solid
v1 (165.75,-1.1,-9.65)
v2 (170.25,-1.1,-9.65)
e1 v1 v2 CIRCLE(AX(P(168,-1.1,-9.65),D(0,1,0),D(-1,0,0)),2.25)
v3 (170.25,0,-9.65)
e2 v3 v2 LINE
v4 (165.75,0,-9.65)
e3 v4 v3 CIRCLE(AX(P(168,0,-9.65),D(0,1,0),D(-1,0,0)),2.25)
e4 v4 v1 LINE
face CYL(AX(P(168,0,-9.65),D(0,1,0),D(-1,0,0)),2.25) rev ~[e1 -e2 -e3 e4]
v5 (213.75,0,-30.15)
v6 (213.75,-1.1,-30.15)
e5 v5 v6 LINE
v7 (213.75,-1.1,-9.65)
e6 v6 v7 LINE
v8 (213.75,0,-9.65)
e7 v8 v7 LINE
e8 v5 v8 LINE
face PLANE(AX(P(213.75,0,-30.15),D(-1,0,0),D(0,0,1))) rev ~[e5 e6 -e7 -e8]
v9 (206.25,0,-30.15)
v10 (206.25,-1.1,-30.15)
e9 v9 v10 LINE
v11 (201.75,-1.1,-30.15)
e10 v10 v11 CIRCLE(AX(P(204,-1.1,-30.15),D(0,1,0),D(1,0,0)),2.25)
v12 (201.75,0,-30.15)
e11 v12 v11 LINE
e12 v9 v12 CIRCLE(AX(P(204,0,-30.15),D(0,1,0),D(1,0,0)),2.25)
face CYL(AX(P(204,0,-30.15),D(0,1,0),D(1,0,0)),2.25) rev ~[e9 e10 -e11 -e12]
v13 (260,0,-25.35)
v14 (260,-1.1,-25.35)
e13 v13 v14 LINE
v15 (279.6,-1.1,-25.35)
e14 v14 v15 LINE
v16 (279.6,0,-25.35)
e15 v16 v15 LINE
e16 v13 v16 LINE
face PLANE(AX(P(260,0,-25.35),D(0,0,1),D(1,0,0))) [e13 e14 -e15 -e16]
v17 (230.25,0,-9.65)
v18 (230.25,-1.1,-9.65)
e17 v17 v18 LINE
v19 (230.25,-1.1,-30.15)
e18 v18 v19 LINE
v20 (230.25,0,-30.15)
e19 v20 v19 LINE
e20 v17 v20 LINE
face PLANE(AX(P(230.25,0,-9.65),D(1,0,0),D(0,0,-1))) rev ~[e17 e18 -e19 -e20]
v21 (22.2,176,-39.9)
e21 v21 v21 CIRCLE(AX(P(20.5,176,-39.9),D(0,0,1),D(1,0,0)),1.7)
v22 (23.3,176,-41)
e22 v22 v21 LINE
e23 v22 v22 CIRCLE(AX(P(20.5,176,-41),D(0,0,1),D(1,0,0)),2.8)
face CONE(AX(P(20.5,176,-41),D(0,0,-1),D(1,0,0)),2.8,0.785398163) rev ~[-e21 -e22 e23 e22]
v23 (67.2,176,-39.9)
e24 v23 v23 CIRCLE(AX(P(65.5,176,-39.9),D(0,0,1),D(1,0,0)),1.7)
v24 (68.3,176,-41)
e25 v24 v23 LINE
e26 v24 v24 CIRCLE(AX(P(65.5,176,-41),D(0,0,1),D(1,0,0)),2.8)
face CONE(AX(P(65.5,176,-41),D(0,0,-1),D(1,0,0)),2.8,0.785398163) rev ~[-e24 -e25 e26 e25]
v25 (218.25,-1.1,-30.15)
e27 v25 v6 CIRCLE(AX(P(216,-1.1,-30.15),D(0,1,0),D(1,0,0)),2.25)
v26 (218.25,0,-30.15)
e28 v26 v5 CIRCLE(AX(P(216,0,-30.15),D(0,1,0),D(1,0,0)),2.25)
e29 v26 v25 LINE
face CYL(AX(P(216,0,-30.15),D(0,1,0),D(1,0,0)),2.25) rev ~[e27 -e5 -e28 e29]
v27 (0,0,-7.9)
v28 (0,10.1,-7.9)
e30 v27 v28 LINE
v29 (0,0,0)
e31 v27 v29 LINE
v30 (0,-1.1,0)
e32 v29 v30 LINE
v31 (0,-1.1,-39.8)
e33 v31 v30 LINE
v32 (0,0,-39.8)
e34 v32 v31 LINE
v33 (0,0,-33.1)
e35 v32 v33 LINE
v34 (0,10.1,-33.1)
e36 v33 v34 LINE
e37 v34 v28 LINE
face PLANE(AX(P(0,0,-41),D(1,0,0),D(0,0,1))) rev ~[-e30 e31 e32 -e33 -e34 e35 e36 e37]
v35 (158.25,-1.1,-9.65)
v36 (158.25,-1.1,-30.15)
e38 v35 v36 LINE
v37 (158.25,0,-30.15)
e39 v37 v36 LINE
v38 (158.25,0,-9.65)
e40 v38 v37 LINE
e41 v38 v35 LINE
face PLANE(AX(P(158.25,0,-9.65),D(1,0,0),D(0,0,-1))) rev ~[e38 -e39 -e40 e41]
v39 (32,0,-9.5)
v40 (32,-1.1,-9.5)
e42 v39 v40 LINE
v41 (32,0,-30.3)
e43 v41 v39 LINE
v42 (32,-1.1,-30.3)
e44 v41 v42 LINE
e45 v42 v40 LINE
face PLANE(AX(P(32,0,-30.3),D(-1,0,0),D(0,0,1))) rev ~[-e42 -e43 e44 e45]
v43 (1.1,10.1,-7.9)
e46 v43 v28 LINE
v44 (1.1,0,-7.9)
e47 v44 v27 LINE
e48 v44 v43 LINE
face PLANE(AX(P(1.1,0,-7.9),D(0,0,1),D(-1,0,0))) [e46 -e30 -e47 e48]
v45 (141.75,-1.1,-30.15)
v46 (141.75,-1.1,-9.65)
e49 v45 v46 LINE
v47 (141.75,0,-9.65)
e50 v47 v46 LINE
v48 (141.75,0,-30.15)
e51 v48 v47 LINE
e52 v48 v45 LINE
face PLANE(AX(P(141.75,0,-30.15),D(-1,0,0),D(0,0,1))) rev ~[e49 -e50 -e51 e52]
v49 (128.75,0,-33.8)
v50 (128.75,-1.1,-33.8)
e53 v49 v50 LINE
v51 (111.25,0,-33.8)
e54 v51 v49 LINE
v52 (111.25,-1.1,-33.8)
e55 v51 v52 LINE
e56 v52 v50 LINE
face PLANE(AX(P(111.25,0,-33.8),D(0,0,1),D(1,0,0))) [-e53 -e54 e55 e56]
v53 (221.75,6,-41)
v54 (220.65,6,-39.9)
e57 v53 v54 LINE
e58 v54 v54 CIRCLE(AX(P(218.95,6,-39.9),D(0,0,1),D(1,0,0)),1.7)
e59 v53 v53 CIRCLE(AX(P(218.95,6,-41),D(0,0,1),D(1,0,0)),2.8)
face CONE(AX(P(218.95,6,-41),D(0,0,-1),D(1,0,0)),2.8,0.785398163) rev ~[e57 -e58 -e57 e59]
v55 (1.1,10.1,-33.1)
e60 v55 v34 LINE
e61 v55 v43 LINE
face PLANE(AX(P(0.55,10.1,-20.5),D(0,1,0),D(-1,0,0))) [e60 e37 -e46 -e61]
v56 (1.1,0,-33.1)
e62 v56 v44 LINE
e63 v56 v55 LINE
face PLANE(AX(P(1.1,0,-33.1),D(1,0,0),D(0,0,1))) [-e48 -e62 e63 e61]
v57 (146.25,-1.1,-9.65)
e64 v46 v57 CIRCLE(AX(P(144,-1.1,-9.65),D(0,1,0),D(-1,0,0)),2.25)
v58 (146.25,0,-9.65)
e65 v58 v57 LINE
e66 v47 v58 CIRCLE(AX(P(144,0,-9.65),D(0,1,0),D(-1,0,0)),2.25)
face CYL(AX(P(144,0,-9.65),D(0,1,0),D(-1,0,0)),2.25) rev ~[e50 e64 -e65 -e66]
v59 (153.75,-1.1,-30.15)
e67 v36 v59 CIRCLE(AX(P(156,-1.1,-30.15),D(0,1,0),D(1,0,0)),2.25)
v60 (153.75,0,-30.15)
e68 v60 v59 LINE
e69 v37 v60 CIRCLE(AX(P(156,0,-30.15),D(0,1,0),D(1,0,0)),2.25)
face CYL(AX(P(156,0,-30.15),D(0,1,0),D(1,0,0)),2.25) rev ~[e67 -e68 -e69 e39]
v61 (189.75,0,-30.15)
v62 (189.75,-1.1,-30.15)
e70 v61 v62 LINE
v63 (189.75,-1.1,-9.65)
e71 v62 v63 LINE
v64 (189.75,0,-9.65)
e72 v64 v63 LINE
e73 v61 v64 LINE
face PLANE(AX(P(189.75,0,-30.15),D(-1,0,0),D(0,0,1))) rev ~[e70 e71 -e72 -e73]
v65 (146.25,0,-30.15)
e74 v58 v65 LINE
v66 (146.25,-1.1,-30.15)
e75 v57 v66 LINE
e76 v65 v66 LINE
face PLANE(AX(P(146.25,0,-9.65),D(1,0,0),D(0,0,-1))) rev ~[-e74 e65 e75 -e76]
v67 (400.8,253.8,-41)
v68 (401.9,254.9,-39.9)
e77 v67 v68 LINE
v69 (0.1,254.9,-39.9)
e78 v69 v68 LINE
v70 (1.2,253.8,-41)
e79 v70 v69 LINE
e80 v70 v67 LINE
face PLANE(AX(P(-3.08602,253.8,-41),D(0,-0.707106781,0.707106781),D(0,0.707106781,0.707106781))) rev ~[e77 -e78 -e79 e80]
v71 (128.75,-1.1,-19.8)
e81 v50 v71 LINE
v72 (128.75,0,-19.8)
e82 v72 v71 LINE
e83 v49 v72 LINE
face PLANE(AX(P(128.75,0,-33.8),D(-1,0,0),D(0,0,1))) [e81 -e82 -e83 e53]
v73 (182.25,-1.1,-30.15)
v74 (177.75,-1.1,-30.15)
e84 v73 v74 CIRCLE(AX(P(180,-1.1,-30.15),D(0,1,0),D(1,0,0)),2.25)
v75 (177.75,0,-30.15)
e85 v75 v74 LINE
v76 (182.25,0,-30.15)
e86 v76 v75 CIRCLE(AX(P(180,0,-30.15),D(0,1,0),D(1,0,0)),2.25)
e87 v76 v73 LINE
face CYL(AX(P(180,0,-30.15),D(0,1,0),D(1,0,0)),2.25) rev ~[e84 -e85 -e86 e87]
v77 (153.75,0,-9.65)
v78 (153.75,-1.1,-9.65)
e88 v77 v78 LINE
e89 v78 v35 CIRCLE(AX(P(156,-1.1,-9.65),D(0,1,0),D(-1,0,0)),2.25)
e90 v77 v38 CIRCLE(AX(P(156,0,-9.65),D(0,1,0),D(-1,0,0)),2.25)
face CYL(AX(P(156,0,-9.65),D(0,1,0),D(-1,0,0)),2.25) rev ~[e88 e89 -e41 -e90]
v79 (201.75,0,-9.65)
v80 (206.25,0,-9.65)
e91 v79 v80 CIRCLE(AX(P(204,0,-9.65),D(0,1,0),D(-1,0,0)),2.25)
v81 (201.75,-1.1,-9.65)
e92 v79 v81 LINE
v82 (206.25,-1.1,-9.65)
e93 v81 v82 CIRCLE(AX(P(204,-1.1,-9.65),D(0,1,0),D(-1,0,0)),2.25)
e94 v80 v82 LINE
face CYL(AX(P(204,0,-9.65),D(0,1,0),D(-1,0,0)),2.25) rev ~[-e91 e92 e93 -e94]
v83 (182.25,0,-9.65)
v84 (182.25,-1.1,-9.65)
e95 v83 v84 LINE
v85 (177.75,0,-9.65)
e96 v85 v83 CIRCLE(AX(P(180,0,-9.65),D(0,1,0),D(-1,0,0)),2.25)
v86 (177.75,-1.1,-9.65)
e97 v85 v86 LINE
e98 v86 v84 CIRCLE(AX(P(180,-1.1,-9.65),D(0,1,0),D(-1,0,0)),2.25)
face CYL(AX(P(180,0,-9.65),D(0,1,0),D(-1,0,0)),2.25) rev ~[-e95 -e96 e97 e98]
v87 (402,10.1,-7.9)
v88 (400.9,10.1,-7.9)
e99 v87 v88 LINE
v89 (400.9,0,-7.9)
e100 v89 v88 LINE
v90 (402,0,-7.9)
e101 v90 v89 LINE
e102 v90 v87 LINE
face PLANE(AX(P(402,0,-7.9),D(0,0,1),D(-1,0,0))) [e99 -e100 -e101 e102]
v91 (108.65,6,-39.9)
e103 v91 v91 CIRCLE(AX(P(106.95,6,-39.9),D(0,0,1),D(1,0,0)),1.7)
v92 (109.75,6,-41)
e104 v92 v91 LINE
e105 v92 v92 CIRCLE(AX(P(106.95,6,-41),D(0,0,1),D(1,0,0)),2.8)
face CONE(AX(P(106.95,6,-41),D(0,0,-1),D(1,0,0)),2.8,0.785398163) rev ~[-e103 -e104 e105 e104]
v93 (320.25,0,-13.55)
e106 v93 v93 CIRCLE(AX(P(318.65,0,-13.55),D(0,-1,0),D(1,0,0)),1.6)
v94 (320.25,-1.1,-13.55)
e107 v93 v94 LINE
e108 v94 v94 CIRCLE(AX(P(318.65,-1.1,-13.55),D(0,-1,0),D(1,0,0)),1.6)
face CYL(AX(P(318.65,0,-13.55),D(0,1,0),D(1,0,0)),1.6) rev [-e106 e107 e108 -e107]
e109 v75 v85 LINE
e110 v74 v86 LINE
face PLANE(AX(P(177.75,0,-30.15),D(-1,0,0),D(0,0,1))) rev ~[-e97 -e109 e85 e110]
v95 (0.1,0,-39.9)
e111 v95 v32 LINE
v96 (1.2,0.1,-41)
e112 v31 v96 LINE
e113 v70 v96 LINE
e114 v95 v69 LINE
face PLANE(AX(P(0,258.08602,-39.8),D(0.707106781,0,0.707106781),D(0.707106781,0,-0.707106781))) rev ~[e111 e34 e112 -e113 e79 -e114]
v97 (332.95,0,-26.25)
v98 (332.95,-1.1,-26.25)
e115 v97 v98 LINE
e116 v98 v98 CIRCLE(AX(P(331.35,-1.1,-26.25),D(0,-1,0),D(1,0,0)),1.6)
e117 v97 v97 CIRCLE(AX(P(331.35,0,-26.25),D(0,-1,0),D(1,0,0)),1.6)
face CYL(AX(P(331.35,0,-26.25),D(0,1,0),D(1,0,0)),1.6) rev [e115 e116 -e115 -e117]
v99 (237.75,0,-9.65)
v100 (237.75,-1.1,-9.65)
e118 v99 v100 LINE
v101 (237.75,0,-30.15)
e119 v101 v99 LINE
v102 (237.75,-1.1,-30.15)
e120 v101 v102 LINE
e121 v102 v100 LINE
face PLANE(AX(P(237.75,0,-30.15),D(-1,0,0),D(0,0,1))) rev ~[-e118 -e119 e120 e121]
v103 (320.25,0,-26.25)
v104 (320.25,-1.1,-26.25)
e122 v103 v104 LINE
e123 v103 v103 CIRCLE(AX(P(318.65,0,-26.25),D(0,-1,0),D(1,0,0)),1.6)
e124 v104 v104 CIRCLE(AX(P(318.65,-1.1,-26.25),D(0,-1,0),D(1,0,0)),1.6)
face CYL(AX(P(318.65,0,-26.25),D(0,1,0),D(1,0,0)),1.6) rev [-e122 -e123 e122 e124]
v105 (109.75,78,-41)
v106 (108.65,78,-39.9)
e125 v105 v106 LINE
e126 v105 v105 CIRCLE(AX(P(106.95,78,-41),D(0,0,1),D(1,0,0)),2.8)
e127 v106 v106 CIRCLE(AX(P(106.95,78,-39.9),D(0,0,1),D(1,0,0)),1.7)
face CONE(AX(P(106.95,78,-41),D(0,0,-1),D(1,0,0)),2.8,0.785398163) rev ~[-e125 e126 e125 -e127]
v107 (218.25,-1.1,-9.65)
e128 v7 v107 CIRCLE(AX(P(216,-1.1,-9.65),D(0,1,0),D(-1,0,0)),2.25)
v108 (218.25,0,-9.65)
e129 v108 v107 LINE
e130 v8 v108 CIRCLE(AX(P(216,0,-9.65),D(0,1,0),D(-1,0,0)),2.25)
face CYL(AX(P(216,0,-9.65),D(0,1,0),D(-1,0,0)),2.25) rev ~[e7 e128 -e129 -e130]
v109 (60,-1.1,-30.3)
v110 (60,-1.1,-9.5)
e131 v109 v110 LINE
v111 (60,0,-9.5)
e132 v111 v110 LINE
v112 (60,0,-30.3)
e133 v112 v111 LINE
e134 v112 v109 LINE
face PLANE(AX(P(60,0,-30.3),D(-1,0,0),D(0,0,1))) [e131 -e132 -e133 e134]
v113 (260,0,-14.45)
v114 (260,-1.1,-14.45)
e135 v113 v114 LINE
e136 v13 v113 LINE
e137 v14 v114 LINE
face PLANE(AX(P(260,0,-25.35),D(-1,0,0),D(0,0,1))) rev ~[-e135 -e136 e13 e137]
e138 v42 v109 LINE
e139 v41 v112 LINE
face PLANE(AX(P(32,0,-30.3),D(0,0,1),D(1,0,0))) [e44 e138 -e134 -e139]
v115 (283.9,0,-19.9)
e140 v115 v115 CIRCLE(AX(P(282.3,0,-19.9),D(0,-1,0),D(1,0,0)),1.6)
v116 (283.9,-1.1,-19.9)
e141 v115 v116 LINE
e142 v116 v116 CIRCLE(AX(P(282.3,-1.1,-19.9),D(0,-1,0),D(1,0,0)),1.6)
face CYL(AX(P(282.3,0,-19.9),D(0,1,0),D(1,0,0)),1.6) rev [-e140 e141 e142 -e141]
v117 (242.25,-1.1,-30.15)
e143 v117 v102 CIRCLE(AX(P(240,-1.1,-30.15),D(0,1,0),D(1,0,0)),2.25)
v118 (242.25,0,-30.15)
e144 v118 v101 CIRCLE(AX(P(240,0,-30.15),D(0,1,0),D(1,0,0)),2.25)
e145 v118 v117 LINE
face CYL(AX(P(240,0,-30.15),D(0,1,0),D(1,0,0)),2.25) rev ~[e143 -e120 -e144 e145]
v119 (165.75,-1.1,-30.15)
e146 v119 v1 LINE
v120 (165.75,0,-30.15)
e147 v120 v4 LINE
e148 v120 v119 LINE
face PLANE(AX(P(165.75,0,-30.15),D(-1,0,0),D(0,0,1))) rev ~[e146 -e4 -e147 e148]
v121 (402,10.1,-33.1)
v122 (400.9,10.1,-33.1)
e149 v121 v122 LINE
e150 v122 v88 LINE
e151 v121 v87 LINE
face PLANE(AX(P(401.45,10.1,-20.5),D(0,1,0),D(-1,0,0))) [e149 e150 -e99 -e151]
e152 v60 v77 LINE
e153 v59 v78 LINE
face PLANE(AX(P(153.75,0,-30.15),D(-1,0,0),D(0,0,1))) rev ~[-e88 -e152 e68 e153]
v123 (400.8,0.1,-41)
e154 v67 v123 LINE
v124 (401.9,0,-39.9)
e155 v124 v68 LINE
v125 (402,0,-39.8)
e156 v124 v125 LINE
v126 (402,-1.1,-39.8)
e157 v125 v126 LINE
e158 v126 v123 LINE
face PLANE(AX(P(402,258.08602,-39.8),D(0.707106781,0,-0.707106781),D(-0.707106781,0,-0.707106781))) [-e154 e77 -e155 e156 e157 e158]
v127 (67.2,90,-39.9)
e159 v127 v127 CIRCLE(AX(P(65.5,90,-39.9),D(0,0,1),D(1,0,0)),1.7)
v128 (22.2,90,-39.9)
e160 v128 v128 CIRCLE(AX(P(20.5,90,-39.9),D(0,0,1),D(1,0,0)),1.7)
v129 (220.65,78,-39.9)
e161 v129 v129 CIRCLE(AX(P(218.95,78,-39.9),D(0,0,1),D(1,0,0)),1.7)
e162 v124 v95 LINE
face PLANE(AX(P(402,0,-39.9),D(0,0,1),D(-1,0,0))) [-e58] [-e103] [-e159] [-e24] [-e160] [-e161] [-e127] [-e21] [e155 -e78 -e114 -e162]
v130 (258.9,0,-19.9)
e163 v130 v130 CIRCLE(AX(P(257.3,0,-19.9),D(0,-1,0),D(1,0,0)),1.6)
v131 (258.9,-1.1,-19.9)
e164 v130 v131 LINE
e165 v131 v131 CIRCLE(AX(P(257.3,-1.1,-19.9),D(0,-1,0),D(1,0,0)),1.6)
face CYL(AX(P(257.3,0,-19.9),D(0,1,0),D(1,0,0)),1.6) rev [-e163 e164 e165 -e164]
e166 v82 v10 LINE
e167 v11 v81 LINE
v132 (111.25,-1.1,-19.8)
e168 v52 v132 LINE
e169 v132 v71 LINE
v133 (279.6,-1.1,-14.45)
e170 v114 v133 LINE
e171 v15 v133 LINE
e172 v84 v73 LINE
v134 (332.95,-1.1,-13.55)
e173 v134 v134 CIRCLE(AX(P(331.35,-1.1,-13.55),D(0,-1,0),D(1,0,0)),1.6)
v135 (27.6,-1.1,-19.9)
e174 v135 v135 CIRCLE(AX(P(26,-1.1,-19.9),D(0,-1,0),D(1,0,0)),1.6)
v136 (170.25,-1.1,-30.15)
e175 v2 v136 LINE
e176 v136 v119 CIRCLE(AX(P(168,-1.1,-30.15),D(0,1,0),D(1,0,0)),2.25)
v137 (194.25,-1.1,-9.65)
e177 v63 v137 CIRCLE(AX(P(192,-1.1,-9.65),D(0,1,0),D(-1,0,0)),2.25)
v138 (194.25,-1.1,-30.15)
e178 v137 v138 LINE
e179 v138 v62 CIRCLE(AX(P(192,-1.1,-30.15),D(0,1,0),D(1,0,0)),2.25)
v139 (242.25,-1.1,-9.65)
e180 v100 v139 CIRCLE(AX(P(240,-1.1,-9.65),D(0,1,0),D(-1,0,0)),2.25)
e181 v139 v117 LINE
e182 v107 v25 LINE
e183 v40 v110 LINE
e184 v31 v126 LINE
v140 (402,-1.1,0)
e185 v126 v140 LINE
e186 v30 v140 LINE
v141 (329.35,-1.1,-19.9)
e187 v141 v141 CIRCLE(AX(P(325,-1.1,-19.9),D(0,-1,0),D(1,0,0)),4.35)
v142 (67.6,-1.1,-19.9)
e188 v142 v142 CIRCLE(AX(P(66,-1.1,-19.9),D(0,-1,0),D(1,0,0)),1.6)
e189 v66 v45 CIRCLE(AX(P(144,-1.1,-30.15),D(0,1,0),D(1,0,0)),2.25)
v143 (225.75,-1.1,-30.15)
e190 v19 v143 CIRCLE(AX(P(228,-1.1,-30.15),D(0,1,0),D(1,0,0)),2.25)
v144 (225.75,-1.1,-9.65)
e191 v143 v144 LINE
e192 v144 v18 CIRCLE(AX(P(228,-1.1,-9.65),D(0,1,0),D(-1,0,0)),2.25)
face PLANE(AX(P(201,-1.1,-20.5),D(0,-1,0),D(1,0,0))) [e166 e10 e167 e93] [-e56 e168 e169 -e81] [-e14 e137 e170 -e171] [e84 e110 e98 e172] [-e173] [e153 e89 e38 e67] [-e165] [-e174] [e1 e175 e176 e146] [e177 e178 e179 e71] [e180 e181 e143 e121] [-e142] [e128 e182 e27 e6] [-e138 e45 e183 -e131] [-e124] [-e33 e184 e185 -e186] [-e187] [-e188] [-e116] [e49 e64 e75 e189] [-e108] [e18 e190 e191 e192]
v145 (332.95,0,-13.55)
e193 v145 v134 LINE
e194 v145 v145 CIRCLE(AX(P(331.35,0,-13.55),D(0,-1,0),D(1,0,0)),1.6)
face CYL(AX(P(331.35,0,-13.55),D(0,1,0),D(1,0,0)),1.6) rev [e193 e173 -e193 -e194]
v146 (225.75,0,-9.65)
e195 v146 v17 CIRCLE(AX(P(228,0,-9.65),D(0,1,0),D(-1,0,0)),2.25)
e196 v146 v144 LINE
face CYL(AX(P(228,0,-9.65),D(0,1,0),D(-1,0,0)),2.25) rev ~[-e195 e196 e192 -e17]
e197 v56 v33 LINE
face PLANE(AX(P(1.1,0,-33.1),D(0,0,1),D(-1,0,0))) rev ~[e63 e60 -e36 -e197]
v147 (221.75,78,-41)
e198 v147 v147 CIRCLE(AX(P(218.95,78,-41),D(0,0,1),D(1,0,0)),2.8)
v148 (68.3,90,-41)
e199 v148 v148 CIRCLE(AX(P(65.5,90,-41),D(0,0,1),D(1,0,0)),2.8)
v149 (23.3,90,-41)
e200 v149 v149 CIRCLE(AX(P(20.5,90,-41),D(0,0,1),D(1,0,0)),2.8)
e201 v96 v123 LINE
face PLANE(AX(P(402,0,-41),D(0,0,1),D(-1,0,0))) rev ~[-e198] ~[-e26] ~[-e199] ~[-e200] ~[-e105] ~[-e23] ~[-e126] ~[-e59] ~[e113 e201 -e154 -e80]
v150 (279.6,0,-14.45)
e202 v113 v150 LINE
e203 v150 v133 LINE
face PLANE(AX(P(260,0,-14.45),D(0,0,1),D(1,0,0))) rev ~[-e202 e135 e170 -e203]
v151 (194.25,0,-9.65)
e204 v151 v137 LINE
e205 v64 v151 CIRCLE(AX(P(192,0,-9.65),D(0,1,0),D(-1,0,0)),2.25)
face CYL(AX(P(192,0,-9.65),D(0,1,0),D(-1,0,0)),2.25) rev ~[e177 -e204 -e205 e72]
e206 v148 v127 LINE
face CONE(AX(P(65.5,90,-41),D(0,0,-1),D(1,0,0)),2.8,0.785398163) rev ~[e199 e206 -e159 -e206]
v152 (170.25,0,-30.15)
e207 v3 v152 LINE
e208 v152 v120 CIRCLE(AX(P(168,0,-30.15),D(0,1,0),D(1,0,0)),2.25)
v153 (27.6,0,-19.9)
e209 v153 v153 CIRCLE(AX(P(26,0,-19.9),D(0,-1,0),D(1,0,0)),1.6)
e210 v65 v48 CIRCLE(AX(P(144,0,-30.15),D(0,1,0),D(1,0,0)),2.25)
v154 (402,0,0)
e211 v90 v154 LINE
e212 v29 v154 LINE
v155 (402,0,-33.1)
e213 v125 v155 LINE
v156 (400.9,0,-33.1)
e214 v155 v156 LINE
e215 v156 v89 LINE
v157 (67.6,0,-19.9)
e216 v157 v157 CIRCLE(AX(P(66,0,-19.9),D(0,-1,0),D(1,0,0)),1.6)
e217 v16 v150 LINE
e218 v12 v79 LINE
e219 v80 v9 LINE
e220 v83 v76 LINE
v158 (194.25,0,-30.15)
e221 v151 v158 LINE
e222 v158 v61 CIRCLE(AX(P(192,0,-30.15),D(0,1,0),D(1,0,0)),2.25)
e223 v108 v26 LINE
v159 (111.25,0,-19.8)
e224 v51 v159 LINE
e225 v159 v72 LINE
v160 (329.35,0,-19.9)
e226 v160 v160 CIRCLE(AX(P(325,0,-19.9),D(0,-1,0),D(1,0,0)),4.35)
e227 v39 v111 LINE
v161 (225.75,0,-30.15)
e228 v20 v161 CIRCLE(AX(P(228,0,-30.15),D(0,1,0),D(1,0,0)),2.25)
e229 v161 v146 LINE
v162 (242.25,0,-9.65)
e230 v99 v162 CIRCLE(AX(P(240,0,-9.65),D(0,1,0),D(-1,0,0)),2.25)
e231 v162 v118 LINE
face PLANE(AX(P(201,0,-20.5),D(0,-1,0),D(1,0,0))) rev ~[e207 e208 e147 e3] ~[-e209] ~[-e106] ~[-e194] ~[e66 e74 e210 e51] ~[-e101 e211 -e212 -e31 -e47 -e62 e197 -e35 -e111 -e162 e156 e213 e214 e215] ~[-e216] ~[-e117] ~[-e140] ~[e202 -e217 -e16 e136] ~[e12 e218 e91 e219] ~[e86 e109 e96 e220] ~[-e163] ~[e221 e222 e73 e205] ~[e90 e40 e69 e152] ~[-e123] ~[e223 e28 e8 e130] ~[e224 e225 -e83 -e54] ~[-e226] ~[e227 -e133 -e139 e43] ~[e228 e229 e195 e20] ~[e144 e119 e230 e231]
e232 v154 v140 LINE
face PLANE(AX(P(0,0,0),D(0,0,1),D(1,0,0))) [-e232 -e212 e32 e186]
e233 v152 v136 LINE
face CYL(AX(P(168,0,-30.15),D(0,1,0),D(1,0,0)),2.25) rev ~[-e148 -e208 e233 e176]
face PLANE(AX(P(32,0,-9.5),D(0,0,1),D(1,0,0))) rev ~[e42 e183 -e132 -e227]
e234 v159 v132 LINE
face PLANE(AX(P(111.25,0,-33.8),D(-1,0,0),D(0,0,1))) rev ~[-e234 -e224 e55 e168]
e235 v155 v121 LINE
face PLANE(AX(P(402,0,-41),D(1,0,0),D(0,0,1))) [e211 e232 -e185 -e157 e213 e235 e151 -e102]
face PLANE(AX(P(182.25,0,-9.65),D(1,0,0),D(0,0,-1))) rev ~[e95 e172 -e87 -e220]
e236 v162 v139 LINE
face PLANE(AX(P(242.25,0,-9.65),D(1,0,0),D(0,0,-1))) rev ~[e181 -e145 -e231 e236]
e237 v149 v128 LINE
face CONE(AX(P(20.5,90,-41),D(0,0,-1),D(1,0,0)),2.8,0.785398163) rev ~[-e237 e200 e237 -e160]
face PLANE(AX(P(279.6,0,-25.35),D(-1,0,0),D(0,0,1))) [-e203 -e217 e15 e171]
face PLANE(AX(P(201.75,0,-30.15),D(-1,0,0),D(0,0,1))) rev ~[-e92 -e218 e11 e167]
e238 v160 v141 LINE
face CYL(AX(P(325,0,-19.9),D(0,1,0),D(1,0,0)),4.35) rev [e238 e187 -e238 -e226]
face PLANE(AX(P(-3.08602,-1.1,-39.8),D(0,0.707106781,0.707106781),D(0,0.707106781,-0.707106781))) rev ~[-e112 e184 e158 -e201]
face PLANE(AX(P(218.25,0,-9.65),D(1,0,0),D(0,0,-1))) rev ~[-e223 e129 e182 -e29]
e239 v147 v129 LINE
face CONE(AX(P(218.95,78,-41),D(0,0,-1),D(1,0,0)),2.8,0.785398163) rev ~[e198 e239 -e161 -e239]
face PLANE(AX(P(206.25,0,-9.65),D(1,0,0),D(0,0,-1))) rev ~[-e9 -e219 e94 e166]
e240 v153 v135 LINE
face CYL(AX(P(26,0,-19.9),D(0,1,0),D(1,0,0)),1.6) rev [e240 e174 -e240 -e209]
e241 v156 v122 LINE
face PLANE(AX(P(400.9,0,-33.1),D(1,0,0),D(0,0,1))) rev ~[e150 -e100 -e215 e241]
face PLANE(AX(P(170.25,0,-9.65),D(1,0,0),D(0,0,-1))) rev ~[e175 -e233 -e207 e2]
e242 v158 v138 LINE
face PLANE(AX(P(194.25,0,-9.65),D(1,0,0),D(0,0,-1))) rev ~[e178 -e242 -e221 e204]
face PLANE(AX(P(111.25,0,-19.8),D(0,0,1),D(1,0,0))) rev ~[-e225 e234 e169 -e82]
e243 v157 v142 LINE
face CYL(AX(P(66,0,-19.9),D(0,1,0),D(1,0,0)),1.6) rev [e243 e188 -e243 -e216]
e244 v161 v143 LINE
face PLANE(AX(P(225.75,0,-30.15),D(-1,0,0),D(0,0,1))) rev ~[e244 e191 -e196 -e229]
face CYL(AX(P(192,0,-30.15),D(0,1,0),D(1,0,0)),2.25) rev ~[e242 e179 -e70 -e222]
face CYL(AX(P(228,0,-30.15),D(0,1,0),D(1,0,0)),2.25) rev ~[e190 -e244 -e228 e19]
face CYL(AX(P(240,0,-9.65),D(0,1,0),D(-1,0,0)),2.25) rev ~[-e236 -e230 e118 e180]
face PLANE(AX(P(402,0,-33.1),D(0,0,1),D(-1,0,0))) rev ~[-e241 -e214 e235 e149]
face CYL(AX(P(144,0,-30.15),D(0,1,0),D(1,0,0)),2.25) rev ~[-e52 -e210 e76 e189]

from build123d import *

# Parameters (mm, degrees)
F0_W         = 402
F0_H         = 41
F0_W_2       = 17.5
F0_H_2       = 14
F0_R         = 1.6
F0_W_3       = 28
F0_H_3       = 20.8
F0_W_4       = 19.6
F0_H_4       = 10.9
F0_R_2       = 4.35
F1_DEPTH     = 1.1
F2_W         = 1.1
F2_H         = 25.2
F3_DEPTH     = 10.1
F4_W         = 402
F4_H         = 1.1
F5_DEPTH     = 255
F7_D         = 3.2
F9_D         = 3.2
F10_T1_DEPTH = 408.1720391711
F10_T3_DEPTH = 262.2720391711


# Not quite as in the source:
# - a fillet or chamfer that OpenCascade refuses, or shapes differently, is made with other operations: its cross-section is extruded or revolved along the edge and cut away or added


with BuildPart() as f1:
    # F0 (on Front) → F1 (new body)
    with BuildSketch(Plane.XZ):
        with Locations((201, -20.5)):
            Rectangle(F0_W, F0_H)
        with Locations((120, -26.8)):
            Rectangle(F0_W_2, F0_H_2, mode=Mode.SUBTRACT)
        with Locations((318.65, -26.25)):
            Circle(F0_R, mode=Mode.SUBTRACT)
        with Locations((331.35, -26.25)):
            Circle(F0_R, mode=Mode.SUBTRACT)
        with Locations((26, -19.9)):
            Circle(F0_R, mode=Mode.SUBTRACT)
        with Locations((46, -19.9)):
            Rectangle(F0_W_3, F0_H_3, mode=Mode.SUBTRACT)
        with Locations((66, -19.9)):
            Circle(F0_R, mode=Mode.SUBTRACT)
        with BuildLine():
            ThreePointArc((141.75, -9.65), (144, -7.4), (146.25, -9.65))
            Line((146.25, -9.65), (146.25, -30.15))
            ThreePointArc((146.25, -30.15), (144, -32.4), (141.75, -30.15))
            Line((141.75, -30.15), (141.75, -9.65))
        make_face(mode=Mode.SUBTRACT)
        with BuildLine():
            ThreePointArc((153.75, -9.65), (156, -7.4), (158.25, -9.65))
            Line((158.25, -9.65), (158.25, -30.15))
            ThreePointArc((158.25, -30.15), (156, -32.4), (153.75, -30.15))
            Line((153.75, -30.15), (153.75, -9.65))
        make_face(mode=Mode.SUBTRACT)
        with BuildLine():
            ThreePointArc((165.75, -9.65), (168, -7.4), (170.25, -9.65))
            Line((170.25, -9.65), (170.25, -30.15))
            ThreePointArc((170.25, -30.15), (168, -32.4), (165.75, -30.15))
            Line((165.75, -30.15), (165.75, -9.65))
        make_face(mode=Mode.SUBTRACT)
        with BuildLine():
            ThreePointArc((177.75, -9.65), (180, -7.4), (182.25, -9.65))
            Line((182.25, -9.65), (182.25, -30.15))
            ThreePointArc((182.25, -30.15), (180, -32.4), (177.75, -30.15))
            Line((177.75, -30.15), (177.75, -9.65))
        make_face(mode=Mode.SUBTRACT)
        with BuildLine():
            ThreePointArc((189.75, -9.65), (192, -7.4), (194.25, -9.65))
            Line((194.25, -9.65), (194.25, -30.15))
            ThreePointArc((194.25, -30.15), (192, -32.4), (189.75, -30.15))
            Line((189.75, -30.15), (189.75, -9.65))
        make_face(mode=Mode.SUBTRACT)
        with BuildLine():
            ThreePointArc((201.75, -9.65), (204, -7.4), (206.25, -9.65))
            Line((206.25, -9.65), (206.25, -30.15))
            ThreePointArc((206.25, -30.15), (204, -32.4), (201.75, -30.15))
            Line((201.75, -30.15), (201.75, -9.65))
        make_face(mode=Mode.SUBTRACT)
        with BuildLine():
            ThreePointArc((213.75, -9.65), (216, -7.4), (218.25, -9.65))
            Line((218.25, -9.65), (218.25, -30.15))
            ThreePointArc((218.25, -30.15), (216, -32.4), (213.75, -30.15))
            Line((213.75, -30.15), (213.75, -9.65))
        make_face(mode=Mode.SUBTRACT)
        with BuildLine():
            ThreePointArc((225.75, -9.65), (228, -7.4), (230.25, -9.65))
            Line((230.25, -9.65), (230.25, -30.15))
            ThreePointArc((230.25, -30.15), (228, -32.4), (225.75, -30.15))
            Line((225.75, -30.15), (225.75, -9.65))
        make_face(mode=Mode.SUBTRACT)
        with BuildLine():
            ThreePointArc((237.75, -9.65), (240, -7.4), (242.25, -9.65))
            Line((242.25, -9.65), (242.25, -30.15))
            ThreePointArc((242.25, -30.15), (240, -32.4), (237.75, -30.15))
            Line((237.75, -30.15), (237.75, -9.65))
        make_face(mode=Mode.SUBTRACT)
        with Locations((257.3, -19.9)):
            Circle(F0_R, mode=Mode.SUBTRACT)
        with Locations((269.8, -19.9)):
            Rectangle(F0_W_4, F0_H_4, mode=Mode.SUBTRACT)
        with Locations((282.3, -19.9)):
            Circle(F0_R, mode=Mode.SUBTRACT)
        with Locations((325, -19.9)):
            Circle(F0_R_2, mode=Mode.SUBTRACT)
        with Locations((318.65, -13.55)):
            Circle(F0_R, mode=Mode.SUBTRACT)
        with Locations((331.35, -13.55)):
            Circle(F0_R, mode=Mode.SUBTRACT)
    extrude(amount=F1_DEPTH)

    # F2 (on face) → F3 (join)
    with BuildSketch(Plane(origin=(0, 0, 0), x_dir=(-1, 0, 0), z_dir=(0, 1, 0))):
        with Locations((-401.45, -20.5)):
            Rectangle(F2_W, F2_H)
        with Locations((-0.55, -20.5)):
            Rectangle(F2_W, F2_H)
    extrude(amount=F3_DEPTH)

    # F4 (on face) → F5 (join)
    with BuildSketch(Plane(origin=(0, 0, 0), x_dir=(-1, 0, 0), z_dir=(0, 1, 0))):
        with Locations((-201, -40.45)):
            Rectangle(F4_W, F4_H)
    extrude(amount=F5_DEPTH)

    # F7 (through all)
    with Locations(Plane.XY.offset(-39.9)):
        with Locations((20.5, 90), (65.5, 90), (65.5, 176), (20.5, 176)):
            Hole(F7_D / 2)

    # F9 (through all)
    with Locations(Plane.XY.offset(-39.9)):
        with Locations((106.95, 6), (106.95, 78), (218.95, 6), (218.95, 78)):
            Hole(F9_D / 2)

    # F10: chamfer of 1.2 on 12 edges, made by hand

    # F10_s2 → F10_t1 (cut)
    with BuildSketch(Plane.YZ.offset(-3.0860195856)):
        Polygon((-1.1, -39.8), (0.1, -41), (-1.1, -41), align=None)
        Polygon((253.8, -41), (255, -39.8), (255, -41), align=None)
    extrude(amount=F10_T1_DEPTH, mode=Mode.SUBTRACT)

    # F10_s4 → F10_t3 (cut)
    with BuildSketch(Plane.XZ.offset(-258.0860195856)):
        Polygon((0, -39.8), (1.2, -41), (0, -41), align=None)
        Polygon((402, -39.8), (400.8, -41), (402, -41), align=None)
    extrude(amount=F10_T3_DEPTH, mode=Mode.SUBTRACT)

    # F10_s5 → F10_t6 (revolve, cut)
    with BuildSketch(Plane.XZ.offset(-6)):
        Polygon((109.75, -41), (108.55, -39.8), (108.55, -41), align=None)
    revolve(axis=Axis((106.95, 6, -41), (0, 0, 1)), mode=Mode.SUBTRACT)

    # F10_s7 → F10_t8 (revolve, cut)
    with BuildSketch(Plane.XZ.offset(-90)):
        Polygon((23.3, -41), (22.1, -39.8), (22.1, -41), align=None)
    revolve(axis=Axis((20.5, 90, -41), (0, 0, 1)), mode=Mode.SUBTRACT)

    # F10_s9 → F10_t10 (revolve, cut)
    with BuildSketch(Plane.XZ.offset(-90)):
        Polygon((68.3, -41), (67.1, -39.8), (67.1, -41), align=None)
    revolve(axis=Axis((65.5, 90, -41), (0, 0, 1)), mode=Mode.SUBTRACT)

    # F10_s11 → F10_t12 (revolve, cut)
    with BuildSketch(Plane.XZ.offset(-78)):
        Polygon((109.75, -41), (108.55, -39.8), (108.55, -41), align=None)
    revolve(axis=Axis((106.95, 78, -41), (0, 0, 1)), mode=Mode.SUBTRACT)

    # F10_s13 → F10_t14 (revolve, cut)
    with BuildSketch(Plane.XZ.offset(-6)):
        Polygon((221.75, -41), (220.55, -39.8), (220.55, -41), align=None)
    revolve(axis=Axis((218.95, 6, -41), (0, 0, 1)), mode=Mode.SUBTRACT)

    # F10_s15 → F10_t16 (revolve, cut)
    with BuildSketch(Plane.XZ.offset(-78)):
        Polygon((221.75, -41), (220.55, -39.8), (220.55, -41), align=None)
    revolve(axis=Axis((218.95, 78, -41), (0, 0, 1)), mode=Mode.SUBTRACT)

    # F10_s17 → F10_t18 (revolve, cut)
    with BuildSketch(Plane.XZ.offset(-176)):
        Polygon((23.3, -41), (22.1, -39.8), (22.1, -41), align=None)
    revolve(axis=Axis((20.5, 176, -41), (0, 0, 1)), mode=Mode.SUBTRACT)

    # F10_s19 → F10_t20 (revolve, cut)
    with BuildSketch(Plane.XZ.offset(-176)):
        Polygon((68.3, -41), (67.1, -39.8), (67.1, -41), align=None)
    revolve(axis=Axis((65.5, 176, -41), (0, 0, 1)), mode=Mode.SUBTRACT)


solid = f1.part
